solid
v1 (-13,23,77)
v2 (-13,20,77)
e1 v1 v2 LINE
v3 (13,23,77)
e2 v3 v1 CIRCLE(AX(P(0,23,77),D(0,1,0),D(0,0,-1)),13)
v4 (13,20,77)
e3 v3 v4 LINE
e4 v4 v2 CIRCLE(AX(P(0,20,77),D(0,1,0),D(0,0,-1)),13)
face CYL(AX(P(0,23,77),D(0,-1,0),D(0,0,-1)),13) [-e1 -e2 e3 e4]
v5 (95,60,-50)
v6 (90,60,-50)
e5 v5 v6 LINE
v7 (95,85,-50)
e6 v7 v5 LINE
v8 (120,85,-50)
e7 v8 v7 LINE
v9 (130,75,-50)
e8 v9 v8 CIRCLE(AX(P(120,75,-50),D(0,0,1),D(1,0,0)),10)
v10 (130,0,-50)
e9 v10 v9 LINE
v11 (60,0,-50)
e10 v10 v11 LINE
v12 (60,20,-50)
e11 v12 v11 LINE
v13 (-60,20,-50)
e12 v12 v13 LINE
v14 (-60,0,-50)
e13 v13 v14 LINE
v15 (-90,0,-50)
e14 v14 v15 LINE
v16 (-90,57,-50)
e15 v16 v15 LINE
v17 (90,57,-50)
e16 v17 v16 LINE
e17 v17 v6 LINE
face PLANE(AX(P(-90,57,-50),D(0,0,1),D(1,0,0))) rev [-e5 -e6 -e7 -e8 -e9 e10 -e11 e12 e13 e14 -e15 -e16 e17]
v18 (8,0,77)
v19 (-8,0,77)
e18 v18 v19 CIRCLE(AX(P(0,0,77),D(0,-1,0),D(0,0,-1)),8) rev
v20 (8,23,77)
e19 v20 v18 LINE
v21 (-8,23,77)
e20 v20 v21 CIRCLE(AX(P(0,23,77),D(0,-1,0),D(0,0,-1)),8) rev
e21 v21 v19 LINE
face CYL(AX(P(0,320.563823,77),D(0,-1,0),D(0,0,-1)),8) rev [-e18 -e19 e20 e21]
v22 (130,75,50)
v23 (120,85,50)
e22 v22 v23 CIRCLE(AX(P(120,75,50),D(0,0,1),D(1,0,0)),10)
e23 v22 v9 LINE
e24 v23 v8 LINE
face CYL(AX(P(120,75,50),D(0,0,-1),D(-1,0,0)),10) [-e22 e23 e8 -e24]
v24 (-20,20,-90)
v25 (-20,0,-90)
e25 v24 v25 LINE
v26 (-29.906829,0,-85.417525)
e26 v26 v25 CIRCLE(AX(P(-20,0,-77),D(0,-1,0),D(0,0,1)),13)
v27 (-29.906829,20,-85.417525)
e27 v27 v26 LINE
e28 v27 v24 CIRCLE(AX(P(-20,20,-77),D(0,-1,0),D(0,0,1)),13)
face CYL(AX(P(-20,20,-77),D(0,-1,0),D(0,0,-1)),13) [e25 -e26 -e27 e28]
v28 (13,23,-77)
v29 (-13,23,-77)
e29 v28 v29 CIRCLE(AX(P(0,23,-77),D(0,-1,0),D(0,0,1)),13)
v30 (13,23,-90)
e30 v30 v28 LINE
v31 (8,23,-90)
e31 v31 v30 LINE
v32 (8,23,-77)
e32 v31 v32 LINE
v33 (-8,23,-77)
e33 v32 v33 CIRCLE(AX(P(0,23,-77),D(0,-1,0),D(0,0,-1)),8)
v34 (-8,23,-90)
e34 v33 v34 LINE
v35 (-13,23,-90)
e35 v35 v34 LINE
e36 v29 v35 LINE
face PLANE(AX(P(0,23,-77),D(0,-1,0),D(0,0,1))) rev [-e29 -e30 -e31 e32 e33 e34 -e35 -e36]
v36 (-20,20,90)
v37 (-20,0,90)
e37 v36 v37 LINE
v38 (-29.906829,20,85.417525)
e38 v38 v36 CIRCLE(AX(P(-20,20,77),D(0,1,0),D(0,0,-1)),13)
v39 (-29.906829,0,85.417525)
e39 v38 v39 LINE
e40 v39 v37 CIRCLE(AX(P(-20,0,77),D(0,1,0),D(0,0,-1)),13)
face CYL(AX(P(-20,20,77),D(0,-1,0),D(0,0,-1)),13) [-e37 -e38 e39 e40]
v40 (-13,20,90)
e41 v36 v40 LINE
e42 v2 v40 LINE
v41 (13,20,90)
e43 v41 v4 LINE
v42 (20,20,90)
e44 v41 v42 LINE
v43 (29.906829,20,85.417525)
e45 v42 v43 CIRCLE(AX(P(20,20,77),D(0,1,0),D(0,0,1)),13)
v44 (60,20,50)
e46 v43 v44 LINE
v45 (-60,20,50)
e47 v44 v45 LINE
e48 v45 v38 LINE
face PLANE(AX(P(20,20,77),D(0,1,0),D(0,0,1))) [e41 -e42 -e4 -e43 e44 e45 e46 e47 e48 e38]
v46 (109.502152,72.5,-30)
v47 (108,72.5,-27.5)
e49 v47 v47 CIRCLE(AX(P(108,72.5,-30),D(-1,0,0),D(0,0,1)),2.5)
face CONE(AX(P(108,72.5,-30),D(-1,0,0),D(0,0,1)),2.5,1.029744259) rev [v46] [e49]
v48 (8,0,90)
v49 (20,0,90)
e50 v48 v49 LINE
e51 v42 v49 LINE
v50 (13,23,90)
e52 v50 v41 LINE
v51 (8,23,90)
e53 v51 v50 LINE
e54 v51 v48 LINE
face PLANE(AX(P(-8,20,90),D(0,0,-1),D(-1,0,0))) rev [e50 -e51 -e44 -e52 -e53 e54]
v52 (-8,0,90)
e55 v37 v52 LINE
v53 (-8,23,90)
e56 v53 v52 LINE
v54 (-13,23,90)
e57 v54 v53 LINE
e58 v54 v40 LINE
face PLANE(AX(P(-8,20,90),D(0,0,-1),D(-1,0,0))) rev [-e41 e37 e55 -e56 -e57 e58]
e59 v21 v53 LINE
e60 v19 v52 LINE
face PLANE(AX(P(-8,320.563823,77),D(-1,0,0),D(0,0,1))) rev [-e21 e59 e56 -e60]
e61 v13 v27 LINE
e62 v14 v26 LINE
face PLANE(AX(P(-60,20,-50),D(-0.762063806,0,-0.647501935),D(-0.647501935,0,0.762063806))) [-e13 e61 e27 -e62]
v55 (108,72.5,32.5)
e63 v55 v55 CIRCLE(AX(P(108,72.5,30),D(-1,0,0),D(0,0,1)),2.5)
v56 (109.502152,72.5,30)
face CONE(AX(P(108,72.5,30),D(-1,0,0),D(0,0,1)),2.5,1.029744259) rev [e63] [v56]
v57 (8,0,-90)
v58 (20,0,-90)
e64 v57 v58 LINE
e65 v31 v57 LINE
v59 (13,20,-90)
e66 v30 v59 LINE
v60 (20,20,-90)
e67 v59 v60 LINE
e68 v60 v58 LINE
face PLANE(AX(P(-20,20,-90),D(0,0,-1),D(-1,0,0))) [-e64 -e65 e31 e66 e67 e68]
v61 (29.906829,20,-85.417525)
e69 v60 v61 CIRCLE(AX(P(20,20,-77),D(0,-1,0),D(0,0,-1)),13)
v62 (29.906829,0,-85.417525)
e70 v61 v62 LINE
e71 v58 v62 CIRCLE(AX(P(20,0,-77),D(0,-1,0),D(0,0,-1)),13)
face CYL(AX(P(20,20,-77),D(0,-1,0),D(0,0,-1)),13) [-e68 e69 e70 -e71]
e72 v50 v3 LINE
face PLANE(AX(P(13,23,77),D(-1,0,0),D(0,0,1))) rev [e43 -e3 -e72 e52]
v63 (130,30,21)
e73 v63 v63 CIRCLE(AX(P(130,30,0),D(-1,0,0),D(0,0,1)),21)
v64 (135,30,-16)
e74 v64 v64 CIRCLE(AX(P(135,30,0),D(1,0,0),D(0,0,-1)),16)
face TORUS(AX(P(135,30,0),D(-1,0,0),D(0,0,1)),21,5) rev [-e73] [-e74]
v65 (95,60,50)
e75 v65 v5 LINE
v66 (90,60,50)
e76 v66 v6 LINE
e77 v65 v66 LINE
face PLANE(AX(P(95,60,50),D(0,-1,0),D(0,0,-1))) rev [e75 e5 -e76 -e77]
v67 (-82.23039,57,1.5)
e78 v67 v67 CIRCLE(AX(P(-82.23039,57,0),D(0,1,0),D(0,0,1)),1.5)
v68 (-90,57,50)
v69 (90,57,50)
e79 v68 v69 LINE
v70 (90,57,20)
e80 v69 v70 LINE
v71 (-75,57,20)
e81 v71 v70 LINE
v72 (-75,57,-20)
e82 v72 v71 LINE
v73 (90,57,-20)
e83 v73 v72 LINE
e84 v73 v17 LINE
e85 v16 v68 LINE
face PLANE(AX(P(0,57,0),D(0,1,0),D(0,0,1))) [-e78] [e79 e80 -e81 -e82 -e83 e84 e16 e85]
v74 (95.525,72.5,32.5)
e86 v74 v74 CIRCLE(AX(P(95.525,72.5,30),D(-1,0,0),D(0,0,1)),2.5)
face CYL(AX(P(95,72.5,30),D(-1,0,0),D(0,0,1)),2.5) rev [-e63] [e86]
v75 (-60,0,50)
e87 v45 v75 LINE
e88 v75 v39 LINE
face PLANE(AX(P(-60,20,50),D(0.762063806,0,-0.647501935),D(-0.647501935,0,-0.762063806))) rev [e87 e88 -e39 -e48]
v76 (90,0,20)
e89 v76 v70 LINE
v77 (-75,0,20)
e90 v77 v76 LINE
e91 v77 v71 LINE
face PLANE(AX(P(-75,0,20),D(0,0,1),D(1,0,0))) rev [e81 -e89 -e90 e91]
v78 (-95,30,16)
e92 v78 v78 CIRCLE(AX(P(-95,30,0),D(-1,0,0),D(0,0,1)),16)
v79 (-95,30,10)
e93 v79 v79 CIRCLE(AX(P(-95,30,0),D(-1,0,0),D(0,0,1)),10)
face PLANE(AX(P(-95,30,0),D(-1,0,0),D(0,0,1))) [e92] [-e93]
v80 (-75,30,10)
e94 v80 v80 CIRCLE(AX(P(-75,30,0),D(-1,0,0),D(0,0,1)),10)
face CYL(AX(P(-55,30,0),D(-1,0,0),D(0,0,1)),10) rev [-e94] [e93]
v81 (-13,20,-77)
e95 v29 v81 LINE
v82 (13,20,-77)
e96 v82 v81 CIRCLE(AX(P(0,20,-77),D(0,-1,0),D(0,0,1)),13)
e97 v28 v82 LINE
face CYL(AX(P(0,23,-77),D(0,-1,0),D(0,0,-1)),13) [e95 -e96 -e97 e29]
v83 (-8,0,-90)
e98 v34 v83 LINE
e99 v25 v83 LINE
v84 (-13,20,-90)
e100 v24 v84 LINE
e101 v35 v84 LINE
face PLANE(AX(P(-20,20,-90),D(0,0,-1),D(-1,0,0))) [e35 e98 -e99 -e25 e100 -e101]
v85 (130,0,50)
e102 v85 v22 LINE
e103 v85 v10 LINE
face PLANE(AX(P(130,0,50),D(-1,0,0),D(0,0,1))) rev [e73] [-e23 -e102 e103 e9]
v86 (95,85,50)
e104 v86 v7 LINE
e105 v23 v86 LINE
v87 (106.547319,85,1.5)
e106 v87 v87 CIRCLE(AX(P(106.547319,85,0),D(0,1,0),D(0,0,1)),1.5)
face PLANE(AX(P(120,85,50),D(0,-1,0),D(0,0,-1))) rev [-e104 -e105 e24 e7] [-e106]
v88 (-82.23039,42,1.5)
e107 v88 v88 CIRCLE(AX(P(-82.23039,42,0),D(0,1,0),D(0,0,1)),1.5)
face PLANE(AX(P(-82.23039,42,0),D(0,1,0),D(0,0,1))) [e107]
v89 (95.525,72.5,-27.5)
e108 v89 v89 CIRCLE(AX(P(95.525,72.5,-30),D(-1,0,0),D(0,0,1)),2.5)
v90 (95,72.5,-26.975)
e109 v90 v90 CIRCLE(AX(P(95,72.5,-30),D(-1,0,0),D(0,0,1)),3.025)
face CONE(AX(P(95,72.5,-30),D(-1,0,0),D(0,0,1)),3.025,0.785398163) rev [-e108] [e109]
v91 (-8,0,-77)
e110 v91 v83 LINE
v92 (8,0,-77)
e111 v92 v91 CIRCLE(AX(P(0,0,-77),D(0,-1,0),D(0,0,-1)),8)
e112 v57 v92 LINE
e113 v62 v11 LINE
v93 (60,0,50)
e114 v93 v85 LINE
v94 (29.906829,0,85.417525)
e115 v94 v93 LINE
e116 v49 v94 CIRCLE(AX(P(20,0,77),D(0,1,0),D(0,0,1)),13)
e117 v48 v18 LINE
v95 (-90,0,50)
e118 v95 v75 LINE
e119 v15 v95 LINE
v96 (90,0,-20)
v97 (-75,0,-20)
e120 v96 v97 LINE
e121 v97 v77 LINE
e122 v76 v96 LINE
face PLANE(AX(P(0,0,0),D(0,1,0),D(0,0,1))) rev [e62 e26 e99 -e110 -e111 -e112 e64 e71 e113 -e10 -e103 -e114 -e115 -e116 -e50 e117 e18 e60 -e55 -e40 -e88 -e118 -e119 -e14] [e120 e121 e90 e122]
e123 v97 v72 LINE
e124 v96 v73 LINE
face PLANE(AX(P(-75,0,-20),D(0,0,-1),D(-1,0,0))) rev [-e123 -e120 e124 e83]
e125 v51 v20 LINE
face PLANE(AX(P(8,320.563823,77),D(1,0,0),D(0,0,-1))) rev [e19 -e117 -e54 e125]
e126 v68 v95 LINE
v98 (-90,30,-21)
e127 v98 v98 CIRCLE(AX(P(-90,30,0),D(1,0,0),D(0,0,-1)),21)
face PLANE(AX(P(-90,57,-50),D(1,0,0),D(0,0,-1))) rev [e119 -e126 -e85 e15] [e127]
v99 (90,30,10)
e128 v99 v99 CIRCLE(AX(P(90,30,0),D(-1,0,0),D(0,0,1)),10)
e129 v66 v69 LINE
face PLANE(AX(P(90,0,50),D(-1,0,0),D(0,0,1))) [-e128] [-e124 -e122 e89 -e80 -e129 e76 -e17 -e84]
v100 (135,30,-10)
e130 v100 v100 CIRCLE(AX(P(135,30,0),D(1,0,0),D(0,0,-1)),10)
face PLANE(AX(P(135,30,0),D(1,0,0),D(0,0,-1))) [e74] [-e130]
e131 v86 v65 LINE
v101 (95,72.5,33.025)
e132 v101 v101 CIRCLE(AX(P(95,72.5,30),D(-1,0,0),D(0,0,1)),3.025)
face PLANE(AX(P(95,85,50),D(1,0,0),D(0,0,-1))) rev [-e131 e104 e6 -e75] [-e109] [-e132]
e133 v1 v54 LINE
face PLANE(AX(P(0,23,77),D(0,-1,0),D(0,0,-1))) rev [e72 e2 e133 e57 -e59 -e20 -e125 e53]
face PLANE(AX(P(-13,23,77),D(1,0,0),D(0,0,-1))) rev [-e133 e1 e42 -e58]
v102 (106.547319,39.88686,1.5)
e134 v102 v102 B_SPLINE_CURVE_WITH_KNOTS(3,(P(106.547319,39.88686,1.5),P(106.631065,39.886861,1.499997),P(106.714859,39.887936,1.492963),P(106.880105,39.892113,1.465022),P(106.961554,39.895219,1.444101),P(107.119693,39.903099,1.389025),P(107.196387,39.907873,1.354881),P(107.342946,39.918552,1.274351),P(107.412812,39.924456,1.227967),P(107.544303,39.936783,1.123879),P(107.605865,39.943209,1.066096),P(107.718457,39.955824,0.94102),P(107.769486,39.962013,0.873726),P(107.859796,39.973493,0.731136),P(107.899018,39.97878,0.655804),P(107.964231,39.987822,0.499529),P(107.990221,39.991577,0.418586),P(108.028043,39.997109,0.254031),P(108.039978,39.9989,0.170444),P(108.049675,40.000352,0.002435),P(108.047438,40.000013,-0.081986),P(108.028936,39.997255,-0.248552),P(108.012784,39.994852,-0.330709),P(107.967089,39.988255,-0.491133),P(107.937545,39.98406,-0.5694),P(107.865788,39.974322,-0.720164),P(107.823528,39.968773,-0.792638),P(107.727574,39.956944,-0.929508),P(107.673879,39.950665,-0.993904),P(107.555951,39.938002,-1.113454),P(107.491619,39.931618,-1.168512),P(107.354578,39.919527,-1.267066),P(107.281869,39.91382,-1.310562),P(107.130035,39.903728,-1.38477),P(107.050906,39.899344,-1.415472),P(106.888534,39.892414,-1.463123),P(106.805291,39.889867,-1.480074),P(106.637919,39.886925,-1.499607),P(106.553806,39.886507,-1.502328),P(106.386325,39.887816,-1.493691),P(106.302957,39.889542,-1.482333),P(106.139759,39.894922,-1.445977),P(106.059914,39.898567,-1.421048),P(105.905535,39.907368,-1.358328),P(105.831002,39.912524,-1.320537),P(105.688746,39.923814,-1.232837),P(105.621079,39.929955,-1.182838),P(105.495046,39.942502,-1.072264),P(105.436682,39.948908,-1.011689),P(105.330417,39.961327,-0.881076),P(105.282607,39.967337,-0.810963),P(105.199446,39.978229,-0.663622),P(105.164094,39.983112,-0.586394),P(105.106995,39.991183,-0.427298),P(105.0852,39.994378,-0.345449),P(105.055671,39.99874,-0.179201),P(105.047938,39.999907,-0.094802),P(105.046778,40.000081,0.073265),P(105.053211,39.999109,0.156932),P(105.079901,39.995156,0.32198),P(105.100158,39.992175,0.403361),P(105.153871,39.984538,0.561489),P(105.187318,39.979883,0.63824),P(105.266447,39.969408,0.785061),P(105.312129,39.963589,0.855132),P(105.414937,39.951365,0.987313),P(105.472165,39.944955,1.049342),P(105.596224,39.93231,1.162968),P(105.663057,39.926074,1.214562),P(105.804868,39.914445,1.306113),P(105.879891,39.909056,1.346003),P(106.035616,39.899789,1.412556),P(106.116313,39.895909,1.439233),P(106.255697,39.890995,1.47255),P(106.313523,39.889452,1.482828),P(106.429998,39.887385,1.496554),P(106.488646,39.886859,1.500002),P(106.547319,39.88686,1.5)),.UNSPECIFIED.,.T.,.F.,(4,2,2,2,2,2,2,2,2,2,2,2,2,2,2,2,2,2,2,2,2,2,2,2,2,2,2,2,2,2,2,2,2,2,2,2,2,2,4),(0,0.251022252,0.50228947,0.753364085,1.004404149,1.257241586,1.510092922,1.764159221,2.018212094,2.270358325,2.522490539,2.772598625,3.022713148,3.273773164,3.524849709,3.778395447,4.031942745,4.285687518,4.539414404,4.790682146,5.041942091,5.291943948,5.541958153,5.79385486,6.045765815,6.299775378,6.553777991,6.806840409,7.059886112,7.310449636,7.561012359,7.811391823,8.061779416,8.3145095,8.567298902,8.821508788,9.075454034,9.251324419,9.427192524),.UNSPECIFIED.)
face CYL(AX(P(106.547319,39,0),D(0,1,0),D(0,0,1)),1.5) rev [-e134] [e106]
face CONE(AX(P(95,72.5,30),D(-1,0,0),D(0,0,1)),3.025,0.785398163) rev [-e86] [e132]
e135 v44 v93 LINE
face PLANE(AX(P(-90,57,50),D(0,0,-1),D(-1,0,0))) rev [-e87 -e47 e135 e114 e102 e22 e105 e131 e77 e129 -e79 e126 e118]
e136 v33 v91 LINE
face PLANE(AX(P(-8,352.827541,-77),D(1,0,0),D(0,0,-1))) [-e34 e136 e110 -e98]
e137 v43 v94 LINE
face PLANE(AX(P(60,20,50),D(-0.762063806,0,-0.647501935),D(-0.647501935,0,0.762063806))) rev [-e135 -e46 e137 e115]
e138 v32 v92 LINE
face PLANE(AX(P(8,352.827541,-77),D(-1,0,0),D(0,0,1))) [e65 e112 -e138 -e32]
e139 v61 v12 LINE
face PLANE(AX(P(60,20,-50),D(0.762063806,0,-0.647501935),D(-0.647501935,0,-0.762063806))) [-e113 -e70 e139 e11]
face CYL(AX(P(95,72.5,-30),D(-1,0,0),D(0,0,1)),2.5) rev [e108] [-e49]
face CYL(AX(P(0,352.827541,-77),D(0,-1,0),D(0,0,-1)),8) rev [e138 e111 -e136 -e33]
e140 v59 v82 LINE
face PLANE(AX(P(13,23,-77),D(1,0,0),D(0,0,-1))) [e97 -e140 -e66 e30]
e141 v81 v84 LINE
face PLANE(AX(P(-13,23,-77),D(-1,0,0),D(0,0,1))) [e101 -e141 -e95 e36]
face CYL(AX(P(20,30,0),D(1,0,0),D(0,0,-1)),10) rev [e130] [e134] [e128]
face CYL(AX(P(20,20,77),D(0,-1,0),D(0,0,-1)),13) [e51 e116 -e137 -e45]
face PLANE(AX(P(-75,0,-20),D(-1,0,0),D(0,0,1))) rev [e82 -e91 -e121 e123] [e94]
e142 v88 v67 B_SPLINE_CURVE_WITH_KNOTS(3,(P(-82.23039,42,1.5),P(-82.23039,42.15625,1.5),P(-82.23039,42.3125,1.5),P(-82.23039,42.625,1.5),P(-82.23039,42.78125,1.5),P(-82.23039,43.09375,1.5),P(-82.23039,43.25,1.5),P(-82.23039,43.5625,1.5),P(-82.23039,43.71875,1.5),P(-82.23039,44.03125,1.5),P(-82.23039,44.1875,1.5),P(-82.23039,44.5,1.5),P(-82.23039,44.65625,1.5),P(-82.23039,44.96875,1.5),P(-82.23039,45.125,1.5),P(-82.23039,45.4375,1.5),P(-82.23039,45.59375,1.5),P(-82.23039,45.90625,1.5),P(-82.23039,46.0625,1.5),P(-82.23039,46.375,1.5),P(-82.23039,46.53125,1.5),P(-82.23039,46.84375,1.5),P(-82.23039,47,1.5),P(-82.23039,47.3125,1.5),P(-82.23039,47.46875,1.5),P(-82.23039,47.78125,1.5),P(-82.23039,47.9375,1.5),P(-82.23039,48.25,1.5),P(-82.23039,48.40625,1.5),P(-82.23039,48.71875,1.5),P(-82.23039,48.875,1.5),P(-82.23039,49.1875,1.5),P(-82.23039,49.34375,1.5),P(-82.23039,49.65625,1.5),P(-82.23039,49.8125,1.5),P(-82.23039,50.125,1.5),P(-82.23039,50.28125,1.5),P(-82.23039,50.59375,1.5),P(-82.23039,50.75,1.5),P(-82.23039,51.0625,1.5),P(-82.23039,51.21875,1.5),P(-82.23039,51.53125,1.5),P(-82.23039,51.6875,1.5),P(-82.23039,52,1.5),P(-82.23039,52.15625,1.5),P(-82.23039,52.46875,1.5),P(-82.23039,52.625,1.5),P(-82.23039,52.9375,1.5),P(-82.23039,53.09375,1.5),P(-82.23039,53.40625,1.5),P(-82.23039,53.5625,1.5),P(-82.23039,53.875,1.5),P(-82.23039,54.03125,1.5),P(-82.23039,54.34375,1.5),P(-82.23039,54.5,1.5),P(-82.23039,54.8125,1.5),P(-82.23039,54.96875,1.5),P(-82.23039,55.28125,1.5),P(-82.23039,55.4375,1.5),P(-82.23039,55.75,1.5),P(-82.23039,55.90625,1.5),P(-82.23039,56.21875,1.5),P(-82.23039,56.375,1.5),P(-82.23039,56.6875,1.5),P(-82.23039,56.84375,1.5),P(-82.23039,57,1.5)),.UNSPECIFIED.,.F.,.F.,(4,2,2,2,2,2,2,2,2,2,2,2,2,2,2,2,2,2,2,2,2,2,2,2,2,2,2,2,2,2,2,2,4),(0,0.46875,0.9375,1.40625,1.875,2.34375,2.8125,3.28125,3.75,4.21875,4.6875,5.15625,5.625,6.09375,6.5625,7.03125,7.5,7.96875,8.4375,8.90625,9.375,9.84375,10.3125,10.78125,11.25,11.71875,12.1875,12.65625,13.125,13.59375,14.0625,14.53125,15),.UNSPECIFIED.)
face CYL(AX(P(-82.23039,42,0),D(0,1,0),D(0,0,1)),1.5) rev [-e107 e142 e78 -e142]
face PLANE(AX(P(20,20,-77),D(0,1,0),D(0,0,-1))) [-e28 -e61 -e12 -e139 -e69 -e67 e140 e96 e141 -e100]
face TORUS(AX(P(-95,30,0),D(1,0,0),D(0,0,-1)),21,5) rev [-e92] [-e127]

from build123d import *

# Parameters (mm, degrees)
SKETCH1_W                   = 180
SKETCH1_H                   = 100
BOSS_EXTRUDE1_DEPTH         = 57
BOSS_EXTRUDE2_DEPTH         = 20
BOSS_EXTRUDE3_DEPTH         = 3
CUT_EXTRUDE2_DEPTH          = 132.742172443
CUT_EXTRUDE2_DEPTH_BACK     = 23
CUT_EXTRUDE3_DEPTH          = 132.742172443
CUT_EXTRUDE3_DEPTH_BACK     = 23
BOSS_EXTRUDE4_DEPTH         = 50
SKETCH8_R                   = 16
BOSS_EXTRUDE5_DEPTH         = 5
BOSS_EXTRUDE6_START         = 5
SKETCH11_R                  = 16
BOSS_EXTRUDE6_DEPTH         = 5
SKETCH13_W                  = 165
SKETCH13_H                  = 40
CUT_EXTRUDE6_DEPTH          = 172.970927776
M6_TAPPED_HOLE1_D           = 5
M6_TAPPED_HOLE1_DEPTH       = 13
M6_TAPPED_HOLE1_CSINK_D     = 6.05
M6_TAPPED_HOLE1_CSINK_ANGLE = 90
M6_TAPPED_HOLE1_TIP         = 1.502151548
FILLET4_R                   = 5
SKETCH17_R                  = 10
CUT_EXTRUDE7_DEPTH          = 40
FILLET5_R                   = 5
CUT_EXTRUDE8_START          = -115
SKETCH18_R                  = 10
CUT_EXTRUDE8_DEPTH          = 115
SKETCH19_R                  = 1.5
CUT_EXTRUDE9_DEPTH          = 15
SKETCH20_R                  = 1.5
CUT_EXTRUDE10_DEPTH         = 46


with BuildPart() as part:
    # Sketch1 → Boss-Extrude1 (new body)
    with BuildSketch(Plane(origin=(0, 0, 0), x_dir=(1, 0, 0), z_dir=(0, 1, 0))):
        Rectangle(SKETCH1_W, SKETCH1_H)
    extrude(amount=BOSS_EXTRUDE1_DEPTH)

    # Sketch2 → Boss-Extrude2 (add)
    with BuildSketch(Plane(origin=(0, 0, 0), x_dir=(1, 0, 0), z_dir=(0, 1, 0))):
        with BuildLine():
            Line((-60, -50), (60, -50))
            Line((60, -50), (29.906829478, -85.417525153))
            ThreePointArc((29.906829478, -85.417525153), (25.4576631, -88.798894588), (20, -90))
            Line((20, -90), (8, -90))
            Line((8, -90), (-8, -90))
            Line((-8, -90), (-20, -90))
            ThreePointArc((-20, -90), (-25.4576631, -88.798894588), (-29.906829478, -85.417525153))
            Line((-29.906829478, -85.417525153), (-60, -50))
        make_face()
    boss_extrude2 = extrude(amount=BOSS_EXTRUDE2_DEPTH)

    # Sketch3 → Boss-Extrude3 (add)
    with BuildSketch(Plane(origin=(0, 20, 0), x_dir=(1, 0, 0), z_dir=(0, 1, 0))):
        with BuildLine():
            Line((-13, -77), (-13, -90))
            Line((-13, -90), (13, -90))
            Line((13, -90), (13, -77))
            ThreePointArc((13, -77), (0, -64), (-13, -77))
        make_face()
    boss_extrude3 = extrude(amount=BOSS_EXTRUDE3_DEPTH)

    # Sketch4 → Cut-Extrude2 (cut, two sides: drawn at the far end of the back side and taken through both)
    with BuildSketch(Plane(origin=(0, 23, 0), x_dir=(1, 0, 0), z_dir=(0, 1, 0)).offset(-CUT_EXTRUDE2_DEPTH_BACK)):
        with BuildLine():
            Line((-8, -441.783557241), (-8, -90))
            Line((-8, -90), (-8, -77))
            ThreePointArc((-8, -77), (0, -69), (8, -77))
            Line((8, -77), (8, -90))
            Line((8, -90), (8, -441.783557241))
            Line((8, -441.783557241), (8, -1145.350671722))
            Line((8, -1145.350671722), (-8, -1145.350671722))
            Line((-8, -1145.350671722), (-8, -441.783557241))
        make_face()
    extrude(amount=CUT_EXTRUDE2_DEPTH + CUT_EXTRUDE2_DEPTH_BACK, mode=Mode.SUBTRACT)

    # Mirror5: Boss-Extrude2 across plane
    add(boss_extrude2.mirror(Plane.XY))

    # Mirror6: Boss-Extrude3 across plane
    add(boss_extrude3.mirror(Plane.XY))

    # Sketch5 → Cut-Extrude3 (cut, two sides: drawn at the far end of the back side and taken through both)
    with BuildSketch(Plane(origin=(0, 23, 0), x_dir=(1, 0, 0), z_dir=(0, 1, 0)).offset(-CUT_EXTRUDE3_DEPTH_BACK)):
        with BuildLine():
            Line((-8, 90), (-8, 77))
            ThreePointArc((-8, 77), (0, 69), (8, 77))
            Line((8, 77), (8, 90))
            Line((8, 90), (-8, 90))
        make_face()
    extrude(amount=CUT_EXTRUDE3_DEPTH + CUT_EXTRUDE3_DEPTH_BACK, mode=Mode.SUBTRACT)

    # Sketch6 → Boss-Extrude4 (add, symmetric)
    with BuildSketch(Plane.XY):
        with BuildLine():
            Line((90, 0), (130, 0))
            Line((130, 0), (130, 75))
            ThreePointArc((130, 75), (127.071067812, 82.071067812), (120, 85))
            Line((120, 85), (95, 85))
            Line((95, 85), (95, 60))
            Line((95, 60), (90, 60))
            Line((90, 60), (90, 57))
            Line((90, 57), (90, 0))
        make_face()
    extrude(amount=BOSS_EXTRUDE4_DEPTH, both=True)

    # Sketch8 → Boss-Extrude5 (add)
    with BuildSketch(Plane(origin=(130, 0, 0), x_dir=(0, 0, -1), z_dir=(1, 0, 0))):
        with Locations(Location((0, 30, 0), (0, 0, 180))):
            Circle(SKETCH8_R)
    extrude(amount=BOSS_EXTRUDE5_DEPTH)

    # Sketch11 → Boss-Extrude6 (add)
    with BuildSketch(Plane.ZY.offset(90).offset(BOSS_EXTRUDE6_START)):
        with Locations((0, 30)):
            Circle(SKETCH11_R)
    extrude(amount=-BOSS_EXTRUDE6_DEPTH)

    # Sketch13 → Cut-Extrude6 (cut, through all)
    with BuildSketch(Plane(origin=(0, 57, 0), x_dir=(1, 0, 0), z_dir=(0, 1, 0))):
        with Locations((7.5, 0)):
            Rectangle(SKETCH13_W, SKETCH13_H)
    extrude(amount=-CUT_EXTRUDE6_DEPTH, mode=Mode.SUBTRACT)

    # M6 Tapped Hole1
    with Locations(Plane(origin=(95, 72.5, -30), x_dir=(0, 0, -1), z_dir=(-1, 0, 0))):
        with Locations((0, 0), (-60, 0)):
            CounterSinkHole(M6_TAPPED_HOLE1_D / 2, M6_TAPPED_HOLE1_CSINK_D / 2, depth=M6_TAPPED_HOLE1_DEPTH, counter_sink_angle=M6_TAPPED_HOLE1_CSINK_ANGLE)
            with Locations((0, 0, -(M6_TAPPED_HOLE1_DEPTH + M6_TAPPED_HOLE1_TIP / 2))):  # 118° drill point
                Cone(0, M6_TAPPED_HOLE1_D / 2, M6_TAPPED_HOLE1_TIP, mode=Mode.SUBTRACT)

    # Fillet4
    fillet4_edges = [part.edges().sort_by_distance(p)[0] for p in [
        (-90, 30, -16),
    ]]
    fillet(fillet4_edges, radius=FILLET4_R - 0.0001)  # a hair under: the kernel refuses the full size

    # Sketch17 → Cut-Extrude7 (cut)
    with BuildSketch(Plane.ZY.offset(95)):
        with Locations((0, 30)):
            Circle(SKETCH17_R)
    extrude(amount=-CUT_EXTRUDE7_DEPTH, mode=Mode.SUBTRACT)

    # Fillet5
    fillet5_edges = [part.edges().sort_by_distance(p)[0] for p in [
        (130, 30, -16),
    ]]
    fillet(fillet5_edges, radius=FILLET5_R - 0.0001)  # a hair under: the kernel refuses the full size

    # Sketch18 → Cut-Extrude8 (cut)
    with BuildSketch(Plane(origin=(135, 0, 0), x_dir=(0, 0, -1), z_dir=(1, 0, 0)).offset(CUT_EXTRUDE8_START)):
        with Locations(Location((0, 30, 0), (0, 0, 180))):
            Circle(SKETCH18_R)
    extrude(amount=CUT_EXTRUDE8_DEPTH, mode=Mode.SUBTRACT)

    # Sketch19 → Cut-Extrude9 (cut)
    with BuildSketch(Plane(origin=(0, 57, 0), x_dir=(1, 0, 0), z_dir=(0, 1, 0))):
        with Locations(Location((-82.230390489, 0, 0), (0, 0, 270))):
            Circle(SKETCH19_R)
    extrude(amount=-CUT_EXTRUDE9_DEPTH, mode=Mode.SUBTRACT)

    # Sketch20 → Cut-Extrude10 (cut)
    with BuildSketch(Plane(origin=(0, 85, 0), x_dir=(1, 0, 0), z_dir=(0, 1, 0))):
        with Locations(Location((106.54731922, 0, 0), (0, 0, 270))):
            Circle(SKETCH20_R)
    extrude(amount=-CUT_EXTRUDE10_DEPTH, mode=Mode.SUBTRACT)


solid = part.part
